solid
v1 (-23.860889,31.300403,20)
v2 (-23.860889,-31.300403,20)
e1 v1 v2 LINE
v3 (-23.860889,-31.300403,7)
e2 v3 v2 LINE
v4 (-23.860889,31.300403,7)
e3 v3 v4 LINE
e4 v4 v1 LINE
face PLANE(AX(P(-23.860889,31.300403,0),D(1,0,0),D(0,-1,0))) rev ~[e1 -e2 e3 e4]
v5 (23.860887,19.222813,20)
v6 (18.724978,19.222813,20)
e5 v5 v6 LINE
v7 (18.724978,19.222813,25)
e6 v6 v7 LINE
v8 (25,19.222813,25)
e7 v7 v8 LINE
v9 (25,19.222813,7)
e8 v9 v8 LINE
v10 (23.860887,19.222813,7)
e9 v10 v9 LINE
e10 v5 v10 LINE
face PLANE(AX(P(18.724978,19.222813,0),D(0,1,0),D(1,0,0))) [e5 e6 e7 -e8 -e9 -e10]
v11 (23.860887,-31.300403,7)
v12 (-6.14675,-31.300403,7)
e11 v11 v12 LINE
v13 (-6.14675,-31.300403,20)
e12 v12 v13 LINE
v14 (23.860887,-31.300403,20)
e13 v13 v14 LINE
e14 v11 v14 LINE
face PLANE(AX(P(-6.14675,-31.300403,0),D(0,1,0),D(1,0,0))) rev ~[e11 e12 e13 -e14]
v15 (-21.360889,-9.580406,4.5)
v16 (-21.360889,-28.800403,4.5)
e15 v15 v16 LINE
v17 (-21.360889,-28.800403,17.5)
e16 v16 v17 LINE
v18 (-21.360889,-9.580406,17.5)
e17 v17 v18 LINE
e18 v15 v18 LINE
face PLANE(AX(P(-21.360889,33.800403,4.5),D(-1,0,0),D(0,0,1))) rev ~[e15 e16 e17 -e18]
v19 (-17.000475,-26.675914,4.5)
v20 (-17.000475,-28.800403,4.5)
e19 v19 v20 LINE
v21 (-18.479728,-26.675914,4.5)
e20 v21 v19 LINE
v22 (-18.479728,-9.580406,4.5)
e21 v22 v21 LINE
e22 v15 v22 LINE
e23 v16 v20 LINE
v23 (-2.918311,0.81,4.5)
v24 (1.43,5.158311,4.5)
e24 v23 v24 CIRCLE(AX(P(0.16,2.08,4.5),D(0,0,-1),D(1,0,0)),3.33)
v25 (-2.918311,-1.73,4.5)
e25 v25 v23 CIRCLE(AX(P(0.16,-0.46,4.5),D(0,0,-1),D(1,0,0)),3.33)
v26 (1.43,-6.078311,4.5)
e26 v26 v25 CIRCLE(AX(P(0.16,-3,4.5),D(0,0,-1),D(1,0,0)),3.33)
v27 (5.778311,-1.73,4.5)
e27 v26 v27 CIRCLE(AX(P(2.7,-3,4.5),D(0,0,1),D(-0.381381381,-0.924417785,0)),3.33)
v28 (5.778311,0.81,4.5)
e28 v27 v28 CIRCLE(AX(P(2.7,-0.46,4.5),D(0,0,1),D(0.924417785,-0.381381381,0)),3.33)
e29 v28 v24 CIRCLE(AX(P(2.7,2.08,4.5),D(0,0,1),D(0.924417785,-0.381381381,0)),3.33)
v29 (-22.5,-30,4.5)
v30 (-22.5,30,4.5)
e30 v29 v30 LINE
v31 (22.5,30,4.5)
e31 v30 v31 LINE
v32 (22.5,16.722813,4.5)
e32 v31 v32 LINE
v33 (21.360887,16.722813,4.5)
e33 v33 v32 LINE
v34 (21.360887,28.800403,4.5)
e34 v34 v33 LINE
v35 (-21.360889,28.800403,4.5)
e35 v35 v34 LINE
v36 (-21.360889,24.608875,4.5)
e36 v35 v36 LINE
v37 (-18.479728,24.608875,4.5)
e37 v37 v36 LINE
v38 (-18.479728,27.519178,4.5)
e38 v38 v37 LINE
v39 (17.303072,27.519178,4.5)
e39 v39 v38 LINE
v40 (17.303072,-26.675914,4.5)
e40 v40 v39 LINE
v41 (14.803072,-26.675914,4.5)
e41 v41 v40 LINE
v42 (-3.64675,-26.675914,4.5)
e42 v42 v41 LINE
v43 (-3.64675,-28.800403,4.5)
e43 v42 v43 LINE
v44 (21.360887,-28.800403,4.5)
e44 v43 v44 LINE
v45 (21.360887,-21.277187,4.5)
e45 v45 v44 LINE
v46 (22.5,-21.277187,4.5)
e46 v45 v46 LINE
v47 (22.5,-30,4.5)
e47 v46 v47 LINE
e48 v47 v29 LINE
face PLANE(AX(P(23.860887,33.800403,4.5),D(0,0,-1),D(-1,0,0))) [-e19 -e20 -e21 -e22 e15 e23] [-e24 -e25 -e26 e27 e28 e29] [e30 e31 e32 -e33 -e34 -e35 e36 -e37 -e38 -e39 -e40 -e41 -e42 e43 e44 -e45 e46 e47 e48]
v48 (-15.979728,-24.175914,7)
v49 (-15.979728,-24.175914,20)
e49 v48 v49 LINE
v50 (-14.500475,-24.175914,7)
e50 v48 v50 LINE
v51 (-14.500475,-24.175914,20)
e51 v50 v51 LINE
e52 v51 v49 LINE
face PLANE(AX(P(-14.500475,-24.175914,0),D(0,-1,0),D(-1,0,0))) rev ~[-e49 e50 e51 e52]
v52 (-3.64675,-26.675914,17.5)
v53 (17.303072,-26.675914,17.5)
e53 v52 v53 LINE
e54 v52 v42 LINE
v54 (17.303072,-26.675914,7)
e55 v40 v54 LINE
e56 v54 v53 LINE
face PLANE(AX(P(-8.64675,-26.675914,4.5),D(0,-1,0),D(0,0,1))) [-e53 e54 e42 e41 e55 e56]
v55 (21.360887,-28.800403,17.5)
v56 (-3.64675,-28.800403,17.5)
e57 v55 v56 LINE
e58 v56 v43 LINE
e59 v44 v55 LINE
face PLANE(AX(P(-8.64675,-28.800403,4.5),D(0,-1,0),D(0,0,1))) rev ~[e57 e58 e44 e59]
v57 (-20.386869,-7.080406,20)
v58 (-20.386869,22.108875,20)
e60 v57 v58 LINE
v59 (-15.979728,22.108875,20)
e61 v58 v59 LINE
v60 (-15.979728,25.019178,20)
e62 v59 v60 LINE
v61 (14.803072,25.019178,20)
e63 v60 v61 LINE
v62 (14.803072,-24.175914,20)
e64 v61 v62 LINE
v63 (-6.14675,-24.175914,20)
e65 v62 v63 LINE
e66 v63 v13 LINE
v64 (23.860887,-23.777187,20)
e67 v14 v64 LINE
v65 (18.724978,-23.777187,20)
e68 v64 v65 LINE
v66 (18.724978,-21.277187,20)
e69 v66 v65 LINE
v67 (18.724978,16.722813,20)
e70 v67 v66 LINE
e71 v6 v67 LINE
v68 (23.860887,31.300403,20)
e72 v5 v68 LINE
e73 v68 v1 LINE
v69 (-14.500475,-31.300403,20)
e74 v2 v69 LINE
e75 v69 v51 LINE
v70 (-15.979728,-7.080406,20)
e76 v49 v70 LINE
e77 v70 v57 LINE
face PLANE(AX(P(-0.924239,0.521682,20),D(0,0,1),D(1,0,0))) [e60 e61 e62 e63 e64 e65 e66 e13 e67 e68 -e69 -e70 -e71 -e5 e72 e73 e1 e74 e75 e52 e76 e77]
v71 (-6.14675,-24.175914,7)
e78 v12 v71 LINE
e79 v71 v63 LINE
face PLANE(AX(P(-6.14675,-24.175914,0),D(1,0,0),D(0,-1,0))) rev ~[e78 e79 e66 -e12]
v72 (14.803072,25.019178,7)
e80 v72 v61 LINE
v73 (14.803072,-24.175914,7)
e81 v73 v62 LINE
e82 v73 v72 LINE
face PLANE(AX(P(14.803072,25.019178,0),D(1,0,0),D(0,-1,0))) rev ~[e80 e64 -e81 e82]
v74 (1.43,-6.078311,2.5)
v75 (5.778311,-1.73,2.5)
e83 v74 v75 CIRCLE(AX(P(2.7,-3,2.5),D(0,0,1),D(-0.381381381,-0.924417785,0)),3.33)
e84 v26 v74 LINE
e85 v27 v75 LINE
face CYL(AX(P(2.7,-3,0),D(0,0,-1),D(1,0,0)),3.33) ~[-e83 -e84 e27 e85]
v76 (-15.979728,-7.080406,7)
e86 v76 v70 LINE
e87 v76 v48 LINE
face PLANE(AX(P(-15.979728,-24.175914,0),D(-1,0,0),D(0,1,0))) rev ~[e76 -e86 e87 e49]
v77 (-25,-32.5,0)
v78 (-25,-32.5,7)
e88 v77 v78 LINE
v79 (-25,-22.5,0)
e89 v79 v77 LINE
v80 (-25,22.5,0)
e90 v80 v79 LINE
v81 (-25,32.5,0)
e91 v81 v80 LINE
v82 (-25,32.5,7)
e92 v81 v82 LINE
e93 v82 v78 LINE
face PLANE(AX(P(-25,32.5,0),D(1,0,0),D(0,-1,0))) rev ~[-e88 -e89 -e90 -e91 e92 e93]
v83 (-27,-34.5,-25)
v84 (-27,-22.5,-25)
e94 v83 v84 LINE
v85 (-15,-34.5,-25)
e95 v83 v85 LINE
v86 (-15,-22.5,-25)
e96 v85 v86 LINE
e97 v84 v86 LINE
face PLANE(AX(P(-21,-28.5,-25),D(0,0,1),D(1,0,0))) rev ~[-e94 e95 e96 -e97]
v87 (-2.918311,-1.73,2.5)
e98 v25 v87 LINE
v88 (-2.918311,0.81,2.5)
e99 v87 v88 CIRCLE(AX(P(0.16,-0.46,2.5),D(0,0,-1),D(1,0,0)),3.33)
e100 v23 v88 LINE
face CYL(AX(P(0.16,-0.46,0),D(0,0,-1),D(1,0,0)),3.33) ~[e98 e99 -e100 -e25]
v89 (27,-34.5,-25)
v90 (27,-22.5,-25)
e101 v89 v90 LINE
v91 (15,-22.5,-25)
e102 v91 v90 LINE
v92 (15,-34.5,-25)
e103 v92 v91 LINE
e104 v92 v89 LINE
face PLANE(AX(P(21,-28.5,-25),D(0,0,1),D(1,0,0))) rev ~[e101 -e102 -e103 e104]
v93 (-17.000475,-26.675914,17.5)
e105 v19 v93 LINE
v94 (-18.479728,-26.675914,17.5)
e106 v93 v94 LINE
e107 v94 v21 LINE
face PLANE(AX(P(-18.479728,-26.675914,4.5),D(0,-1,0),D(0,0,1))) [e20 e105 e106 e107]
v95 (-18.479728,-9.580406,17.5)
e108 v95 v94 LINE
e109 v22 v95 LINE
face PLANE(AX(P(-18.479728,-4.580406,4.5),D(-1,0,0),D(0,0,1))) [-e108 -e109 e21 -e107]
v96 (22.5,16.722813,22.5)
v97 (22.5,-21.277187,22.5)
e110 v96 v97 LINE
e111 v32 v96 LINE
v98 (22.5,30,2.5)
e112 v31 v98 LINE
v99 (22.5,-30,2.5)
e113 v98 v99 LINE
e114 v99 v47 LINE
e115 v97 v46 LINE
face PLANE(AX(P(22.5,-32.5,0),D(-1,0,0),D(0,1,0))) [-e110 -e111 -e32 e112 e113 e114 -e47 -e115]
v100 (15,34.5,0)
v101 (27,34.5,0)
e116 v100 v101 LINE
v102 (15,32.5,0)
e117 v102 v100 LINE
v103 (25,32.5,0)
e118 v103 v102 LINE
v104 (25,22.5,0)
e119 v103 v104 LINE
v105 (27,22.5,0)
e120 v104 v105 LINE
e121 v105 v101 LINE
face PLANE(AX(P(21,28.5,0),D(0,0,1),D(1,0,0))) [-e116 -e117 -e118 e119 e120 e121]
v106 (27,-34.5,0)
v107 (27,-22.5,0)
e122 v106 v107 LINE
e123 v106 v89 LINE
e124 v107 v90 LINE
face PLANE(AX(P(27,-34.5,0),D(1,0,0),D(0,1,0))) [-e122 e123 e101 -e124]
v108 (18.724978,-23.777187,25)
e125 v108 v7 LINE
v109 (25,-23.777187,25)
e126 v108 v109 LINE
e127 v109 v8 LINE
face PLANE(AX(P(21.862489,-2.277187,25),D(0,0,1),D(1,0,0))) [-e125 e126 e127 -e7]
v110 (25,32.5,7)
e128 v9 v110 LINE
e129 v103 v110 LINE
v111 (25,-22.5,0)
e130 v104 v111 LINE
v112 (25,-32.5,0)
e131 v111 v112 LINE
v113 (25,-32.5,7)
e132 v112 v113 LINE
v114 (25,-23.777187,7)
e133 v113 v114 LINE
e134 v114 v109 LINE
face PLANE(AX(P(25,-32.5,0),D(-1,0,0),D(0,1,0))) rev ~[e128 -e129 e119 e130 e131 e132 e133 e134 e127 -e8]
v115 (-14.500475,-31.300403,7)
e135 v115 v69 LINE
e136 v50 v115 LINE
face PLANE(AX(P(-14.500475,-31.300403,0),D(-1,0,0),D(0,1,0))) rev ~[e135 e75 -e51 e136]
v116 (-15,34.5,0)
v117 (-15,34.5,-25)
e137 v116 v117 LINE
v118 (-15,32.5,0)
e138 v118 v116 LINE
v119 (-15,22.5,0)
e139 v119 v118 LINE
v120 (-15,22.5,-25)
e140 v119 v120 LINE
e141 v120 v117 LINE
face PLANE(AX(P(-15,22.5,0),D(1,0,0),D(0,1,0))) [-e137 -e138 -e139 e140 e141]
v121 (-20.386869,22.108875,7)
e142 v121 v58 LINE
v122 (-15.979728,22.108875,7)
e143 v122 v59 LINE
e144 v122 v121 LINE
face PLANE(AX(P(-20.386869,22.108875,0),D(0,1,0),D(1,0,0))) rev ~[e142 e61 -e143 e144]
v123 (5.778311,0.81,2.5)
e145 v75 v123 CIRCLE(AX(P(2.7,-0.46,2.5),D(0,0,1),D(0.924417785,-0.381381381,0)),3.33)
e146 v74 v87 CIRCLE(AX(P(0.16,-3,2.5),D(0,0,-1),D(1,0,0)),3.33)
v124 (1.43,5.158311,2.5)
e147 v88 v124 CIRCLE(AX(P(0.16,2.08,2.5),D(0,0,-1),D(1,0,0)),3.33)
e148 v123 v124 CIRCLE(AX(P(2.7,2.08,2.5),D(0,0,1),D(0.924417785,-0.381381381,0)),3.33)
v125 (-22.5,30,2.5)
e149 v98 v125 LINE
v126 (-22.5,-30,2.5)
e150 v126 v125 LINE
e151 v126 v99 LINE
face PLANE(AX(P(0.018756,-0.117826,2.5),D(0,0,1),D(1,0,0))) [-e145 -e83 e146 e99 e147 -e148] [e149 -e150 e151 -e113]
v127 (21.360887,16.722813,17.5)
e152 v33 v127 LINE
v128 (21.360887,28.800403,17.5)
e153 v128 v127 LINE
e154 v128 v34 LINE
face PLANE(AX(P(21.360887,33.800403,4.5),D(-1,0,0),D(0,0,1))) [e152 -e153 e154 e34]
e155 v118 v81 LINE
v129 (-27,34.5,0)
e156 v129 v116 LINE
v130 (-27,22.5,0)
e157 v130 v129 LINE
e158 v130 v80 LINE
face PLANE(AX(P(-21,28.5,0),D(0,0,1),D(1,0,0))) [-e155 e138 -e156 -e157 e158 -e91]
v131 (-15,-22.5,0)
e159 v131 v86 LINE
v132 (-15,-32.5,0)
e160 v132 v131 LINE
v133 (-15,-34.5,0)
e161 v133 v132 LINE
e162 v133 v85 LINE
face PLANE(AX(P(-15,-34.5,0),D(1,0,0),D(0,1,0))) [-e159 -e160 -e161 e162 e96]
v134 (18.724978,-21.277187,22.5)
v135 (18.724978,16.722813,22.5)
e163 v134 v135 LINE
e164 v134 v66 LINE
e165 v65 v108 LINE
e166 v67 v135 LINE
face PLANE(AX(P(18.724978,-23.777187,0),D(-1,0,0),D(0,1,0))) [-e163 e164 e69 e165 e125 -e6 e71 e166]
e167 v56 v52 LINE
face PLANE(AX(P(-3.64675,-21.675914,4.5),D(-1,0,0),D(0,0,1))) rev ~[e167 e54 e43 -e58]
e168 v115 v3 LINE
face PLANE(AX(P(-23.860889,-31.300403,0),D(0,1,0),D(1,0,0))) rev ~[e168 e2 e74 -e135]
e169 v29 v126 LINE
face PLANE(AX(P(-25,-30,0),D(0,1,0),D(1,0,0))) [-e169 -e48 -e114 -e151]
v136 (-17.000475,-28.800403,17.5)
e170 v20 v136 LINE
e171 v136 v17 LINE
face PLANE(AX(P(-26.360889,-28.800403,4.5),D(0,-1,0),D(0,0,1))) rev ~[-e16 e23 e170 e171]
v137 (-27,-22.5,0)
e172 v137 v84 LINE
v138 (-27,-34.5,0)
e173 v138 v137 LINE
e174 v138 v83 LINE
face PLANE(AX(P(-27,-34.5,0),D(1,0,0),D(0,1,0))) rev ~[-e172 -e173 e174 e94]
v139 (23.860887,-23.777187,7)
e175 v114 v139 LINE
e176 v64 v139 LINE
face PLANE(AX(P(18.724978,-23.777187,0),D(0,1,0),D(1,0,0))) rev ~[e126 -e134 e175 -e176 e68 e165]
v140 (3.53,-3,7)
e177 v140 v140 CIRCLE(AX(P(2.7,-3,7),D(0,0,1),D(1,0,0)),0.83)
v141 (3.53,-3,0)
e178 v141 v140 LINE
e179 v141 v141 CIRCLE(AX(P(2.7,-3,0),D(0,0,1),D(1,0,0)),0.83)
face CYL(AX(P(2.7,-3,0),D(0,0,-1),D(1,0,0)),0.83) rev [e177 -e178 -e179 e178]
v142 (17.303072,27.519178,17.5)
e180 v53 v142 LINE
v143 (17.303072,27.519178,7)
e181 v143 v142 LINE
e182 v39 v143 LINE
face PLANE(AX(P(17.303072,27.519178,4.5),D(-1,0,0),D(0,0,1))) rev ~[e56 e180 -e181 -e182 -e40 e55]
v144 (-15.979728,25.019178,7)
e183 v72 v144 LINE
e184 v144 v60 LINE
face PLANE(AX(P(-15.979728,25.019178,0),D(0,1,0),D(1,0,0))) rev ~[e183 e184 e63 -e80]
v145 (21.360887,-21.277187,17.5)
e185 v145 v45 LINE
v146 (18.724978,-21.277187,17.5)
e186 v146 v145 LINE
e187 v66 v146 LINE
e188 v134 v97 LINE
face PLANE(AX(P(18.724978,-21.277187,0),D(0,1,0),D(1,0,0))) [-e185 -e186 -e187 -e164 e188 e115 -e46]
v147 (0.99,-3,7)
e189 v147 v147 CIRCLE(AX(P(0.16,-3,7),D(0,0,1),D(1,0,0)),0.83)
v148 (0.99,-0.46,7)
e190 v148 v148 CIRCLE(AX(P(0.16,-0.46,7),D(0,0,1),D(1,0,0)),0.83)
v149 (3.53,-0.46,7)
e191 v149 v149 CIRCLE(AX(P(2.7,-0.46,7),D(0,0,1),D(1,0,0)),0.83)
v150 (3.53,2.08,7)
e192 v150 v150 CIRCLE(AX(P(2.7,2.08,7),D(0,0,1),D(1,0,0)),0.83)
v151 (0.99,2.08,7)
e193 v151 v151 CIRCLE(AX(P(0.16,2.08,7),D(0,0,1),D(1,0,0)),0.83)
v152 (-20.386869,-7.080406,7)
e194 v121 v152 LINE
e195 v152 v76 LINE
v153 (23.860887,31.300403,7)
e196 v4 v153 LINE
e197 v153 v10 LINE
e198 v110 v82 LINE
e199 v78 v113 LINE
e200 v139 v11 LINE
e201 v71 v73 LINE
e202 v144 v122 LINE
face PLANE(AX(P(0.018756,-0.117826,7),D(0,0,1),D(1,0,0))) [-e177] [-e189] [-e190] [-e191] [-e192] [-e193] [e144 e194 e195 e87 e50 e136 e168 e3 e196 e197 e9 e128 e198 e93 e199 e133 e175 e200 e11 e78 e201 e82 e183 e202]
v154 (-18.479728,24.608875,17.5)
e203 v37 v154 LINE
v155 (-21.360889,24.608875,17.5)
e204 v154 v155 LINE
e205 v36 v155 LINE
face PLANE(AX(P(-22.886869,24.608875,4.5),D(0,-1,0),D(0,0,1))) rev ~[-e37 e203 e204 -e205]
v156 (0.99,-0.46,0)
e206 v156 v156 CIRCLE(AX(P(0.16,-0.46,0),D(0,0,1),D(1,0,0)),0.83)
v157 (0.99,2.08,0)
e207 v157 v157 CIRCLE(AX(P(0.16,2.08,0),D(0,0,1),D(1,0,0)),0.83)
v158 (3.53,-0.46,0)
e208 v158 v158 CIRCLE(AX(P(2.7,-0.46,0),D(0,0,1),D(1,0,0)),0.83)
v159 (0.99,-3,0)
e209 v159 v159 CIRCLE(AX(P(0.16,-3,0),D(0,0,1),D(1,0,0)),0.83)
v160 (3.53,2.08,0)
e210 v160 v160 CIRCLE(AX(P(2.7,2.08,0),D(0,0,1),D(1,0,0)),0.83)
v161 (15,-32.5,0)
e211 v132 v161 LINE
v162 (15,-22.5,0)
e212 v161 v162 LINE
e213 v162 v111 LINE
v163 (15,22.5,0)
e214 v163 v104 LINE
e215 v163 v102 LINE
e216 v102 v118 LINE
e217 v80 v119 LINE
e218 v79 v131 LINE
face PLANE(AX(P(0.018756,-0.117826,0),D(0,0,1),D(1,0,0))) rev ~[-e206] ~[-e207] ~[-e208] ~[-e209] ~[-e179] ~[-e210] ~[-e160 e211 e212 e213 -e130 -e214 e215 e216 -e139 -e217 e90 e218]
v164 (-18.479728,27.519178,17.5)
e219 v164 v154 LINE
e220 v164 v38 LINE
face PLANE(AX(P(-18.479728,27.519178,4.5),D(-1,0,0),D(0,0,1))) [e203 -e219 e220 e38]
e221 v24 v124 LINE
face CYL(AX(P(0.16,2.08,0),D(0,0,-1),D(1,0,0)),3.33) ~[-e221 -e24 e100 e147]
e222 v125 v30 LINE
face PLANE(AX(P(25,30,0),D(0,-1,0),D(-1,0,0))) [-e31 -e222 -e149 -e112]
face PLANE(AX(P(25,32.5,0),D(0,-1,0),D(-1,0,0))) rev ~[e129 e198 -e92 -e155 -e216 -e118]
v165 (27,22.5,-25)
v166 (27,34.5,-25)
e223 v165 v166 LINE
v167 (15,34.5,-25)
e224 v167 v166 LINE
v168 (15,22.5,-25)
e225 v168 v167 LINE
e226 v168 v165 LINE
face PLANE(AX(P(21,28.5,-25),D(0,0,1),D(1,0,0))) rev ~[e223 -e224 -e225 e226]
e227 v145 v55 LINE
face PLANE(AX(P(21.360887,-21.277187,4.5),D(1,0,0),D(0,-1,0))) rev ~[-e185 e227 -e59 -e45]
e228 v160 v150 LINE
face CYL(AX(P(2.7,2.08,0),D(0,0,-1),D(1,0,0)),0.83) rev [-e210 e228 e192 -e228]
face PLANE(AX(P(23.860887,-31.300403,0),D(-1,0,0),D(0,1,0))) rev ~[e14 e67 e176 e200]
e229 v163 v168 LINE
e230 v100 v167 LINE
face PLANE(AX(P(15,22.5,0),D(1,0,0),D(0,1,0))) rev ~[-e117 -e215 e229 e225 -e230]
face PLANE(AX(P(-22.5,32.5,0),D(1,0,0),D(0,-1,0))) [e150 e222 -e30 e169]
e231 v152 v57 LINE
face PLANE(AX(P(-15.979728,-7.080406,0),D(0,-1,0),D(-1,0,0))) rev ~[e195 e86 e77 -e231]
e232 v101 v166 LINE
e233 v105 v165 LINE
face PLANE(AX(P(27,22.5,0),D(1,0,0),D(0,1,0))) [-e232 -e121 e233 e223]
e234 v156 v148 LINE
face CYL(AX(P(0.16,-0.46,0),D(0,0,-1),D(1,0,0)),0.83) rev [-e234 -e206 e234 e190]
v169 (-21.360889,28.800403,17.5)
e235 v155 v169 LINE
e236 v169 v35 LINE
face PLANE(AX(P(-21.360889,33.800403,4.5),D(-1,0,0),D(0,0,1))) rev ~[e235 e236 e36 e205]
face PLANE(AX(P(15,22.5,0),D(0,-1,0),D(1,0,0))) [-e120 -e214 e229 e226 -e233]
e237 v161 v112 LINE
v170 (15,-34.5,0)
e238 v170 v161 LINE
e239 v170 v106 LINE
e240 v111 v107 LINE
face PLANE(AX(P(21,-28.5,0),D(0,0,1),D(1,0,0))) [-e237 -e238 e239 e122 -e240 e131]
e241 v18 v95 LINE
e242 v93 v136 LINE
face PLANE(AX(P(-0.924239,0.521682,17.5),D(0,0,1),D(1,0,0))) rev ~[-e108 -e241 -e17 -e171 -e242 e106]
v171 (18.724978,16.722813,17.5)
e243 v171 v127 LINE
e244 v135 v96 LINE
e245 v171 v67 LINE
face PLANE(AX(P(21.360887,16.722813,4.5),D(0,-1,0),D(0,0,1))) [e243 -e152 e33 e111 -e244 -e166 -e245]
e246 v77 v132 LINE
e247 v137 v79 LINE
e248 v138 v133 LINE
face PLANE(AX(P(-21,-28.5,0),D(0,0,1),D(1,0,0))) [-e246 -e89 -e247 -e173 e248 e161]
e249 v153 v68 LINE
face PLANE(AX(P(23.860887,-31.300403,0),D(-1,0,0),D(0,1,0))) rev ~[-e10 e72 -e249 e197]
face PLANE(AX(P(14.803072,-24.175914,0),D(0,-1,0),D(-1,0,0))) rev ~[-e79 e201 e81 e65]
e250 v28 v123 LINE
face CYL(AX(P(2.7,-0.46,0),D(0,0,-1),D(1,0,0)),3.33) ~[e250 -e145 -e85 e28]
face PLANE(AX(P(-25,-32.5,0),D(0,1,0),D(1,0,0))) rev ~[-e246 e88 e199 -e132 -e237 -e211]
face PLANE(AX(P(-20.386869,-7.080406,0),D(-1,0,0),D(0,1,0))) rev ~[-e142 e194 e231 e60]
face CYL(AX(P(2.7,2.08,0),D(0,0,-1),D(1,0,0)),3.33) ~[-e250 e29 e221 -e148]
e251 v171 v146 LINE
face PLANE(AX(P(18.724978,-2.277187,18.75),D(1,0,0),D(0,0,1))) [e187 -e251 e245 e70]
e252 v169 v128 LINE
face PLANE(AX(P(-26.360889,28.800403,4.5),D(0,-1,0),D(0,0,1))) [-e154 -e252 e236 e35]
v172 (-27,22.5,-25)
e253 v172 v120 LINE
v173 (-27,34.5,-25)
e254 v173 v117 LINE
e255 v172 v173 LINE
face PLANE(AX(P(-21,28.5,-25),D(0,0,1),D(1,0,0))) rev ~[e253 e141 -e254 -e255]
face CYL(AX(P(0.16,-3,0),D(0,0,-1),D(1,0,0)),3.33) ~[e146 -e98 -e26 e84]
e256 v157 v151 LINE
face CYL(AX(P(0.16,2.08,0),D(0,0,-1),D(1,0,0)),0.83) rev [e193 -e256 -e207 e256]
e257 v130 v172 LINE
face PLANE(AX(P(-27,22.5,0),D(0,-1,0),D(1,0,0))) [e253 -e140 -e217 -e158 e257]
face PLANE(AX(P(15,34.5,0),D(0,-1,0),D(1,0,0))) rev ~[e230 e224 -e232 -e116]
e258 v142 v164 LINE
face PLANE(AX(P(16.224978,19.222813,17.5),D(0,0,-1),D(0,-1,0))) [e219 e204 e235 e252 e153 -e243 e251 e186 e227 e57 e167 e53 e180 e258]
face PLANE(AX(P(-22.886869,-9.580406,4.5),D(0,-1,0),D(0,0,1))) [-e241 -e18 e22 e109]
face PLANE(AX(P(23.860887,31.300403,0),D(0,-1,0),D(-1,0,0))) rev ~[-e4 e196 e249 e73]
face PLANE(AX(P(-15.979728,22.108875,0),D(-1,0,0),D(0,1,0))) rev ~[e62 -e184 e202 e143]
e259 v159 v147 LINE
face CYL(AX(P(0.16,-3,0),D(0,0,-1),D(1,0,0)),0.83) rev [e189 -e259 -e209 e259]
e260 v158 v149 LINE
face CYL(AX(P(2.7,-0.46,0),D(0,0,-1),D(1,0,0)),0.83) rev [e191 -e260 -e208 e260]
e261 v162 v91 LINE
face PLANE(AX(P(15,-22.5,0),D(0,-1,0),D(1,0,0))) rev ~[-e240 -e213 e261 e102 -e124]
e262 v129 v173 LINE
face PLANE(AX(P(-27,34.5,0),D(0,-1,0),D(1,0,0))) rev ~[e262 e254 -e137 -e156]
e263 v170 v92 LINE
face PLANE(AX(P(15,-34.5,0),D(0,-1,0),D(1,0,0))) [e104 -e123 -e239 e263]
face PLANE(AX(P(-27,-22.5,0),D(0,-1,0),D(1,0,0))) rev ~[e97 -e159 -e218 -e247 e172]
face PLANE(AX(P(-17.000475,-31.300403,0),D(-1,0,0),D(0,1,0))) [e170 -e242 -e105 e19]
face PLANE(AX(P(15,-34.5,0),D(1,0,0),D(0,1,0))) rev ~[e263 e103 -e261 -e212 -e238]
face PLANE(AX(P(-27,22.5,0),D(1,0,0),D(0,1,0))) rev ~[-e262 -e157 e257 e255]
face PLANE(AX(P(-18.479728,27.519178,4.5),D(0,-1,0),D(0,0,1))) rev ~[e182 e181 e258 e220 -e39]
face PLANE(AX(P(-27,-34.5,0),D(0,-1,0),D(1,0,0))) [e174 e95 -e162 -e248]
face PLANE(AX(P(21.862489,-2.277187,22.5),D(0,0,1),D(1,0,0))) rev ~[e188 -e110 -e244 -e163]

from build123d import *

# Parameters (mm, degrees)
F0_R         = 0.83
F1_DEPTH     = 7
F3_DEPTH     = 20
F0_W         = 6.2750220299
F0_H         = 43
F4_DEPTH     = 25
F5_T         = 2.5
F5_T3_DEPTH  = 6.139113307
F5_T5_DEPTH  = 17.0775900483
F5_T7_DEPTH  = 52.7217752486
F5_T9_DEPTH  = 67.6008063555
F5_T11_DEPTH = 14.360413067
F5_T13_DEPTH = 12.124489639
F5_T15_DEPTH = 6.4792522416
F5_T17_DEPTH = 22.0955071226
F5_T19_DEPTH = 9.4071413577
F5_T21_DEPTH = 34.1892816313
F5_T23_DEPTH = 7.9103027191
F5_T25_DEPTH = 35.7827994693
F5_T27_DEPTH = 54.1950914729
F5_T29_DEPTH = 25.949822152
F5_T31_DEPTH = 35.0076371059
F5_T33_DEPTH = 12.5232163072
F5_T35_DEPTH = 10.1359087229
F5_T37_DEPTH = 18
F6_W         = 12
F6_H         = 12
F7_DEPTH     = 25


# Not quite as in the source:
# - a shell that OpenCascade refuses in one call is made with other operations: the cavity is built on its own and cut out


with BuildPart() as f1:
    # F0 (on Top) → F1 (new body)
    with BuildSketch(Plane.XY):
        Polygon((25, 32.5), (-25, 32.5), (-25, -32.5), (25, -32.5), (25, -23.7771868706), (18.7249779701, -23.7771868706), (18.7249779701, 19.2228131294), (25, 19.2228131294), align=None)
        with Locations((0.16, -3)):
            Circle(F0_R, mode=Mode.SUBTRACT)
        with Locations((2.7, -3)):
            Circle(F0_R, mode=Mode.SUBTRACT)
        with Locations((0.16, -0.46)):
            Circle(F0_R, mode=Mode.SUBTRACT)
        with Locations((2.7, -0.46)):
            Circle(F0_R, mode=Mode.SUBTRACT)
        with Locations((0.16, 2.08)):
            Circle(F0_R, mode=Mode.SUBTRACT)
        with Locations((2.7, 2.08)):
            Circle(F0_R, mode=Mode.SUBTRACT)
    extrude(amount=F1_DEPTH)

    # F2 (on Top) → F3 (join)
    with BuildSketch(Plane.XY):
        Polygon((23.860886693, 31.3004031777), (-23.8608885556, 31.3004031777), (-23.8608885556, -31.3004031777), (-14.5004754886, -31.3004031777), (-14.5004754886, -24.1759135388), (-15.9797277302, -24.1759135388), (-15.9797277302, -7.0804064162), (-20.3868690878, -7.0804064162), (-20.3868690878, 22.1088752151), (-15.9797277302, 22.1088752151), (-15.9797277302, 25.0191779342), (14.8030717392, 25.0191779342), (14.8030717392, -24.1759135388), (-6.1467504129, -24.1759135388), (-6.1467504129, -31.3004031777), (23.860886693, -31.3004031777), align=None)
    extrude(amount=F3_DEPTH)

    # F0 (on Top) → F4 (join)
    with BuildSketch(Plane.XY):
        with Locations((21.8624889851, -2.2771868706)):
            Rectangle(F0_W, F0_H)
    extrude(amount=F4_DEPTH)

    # F5: shell of thickness 2.5, made by hand


with BuildPart() as f5_core1:
    # F5_t2: copy of F1
    add(f1.part)

    # the walls: a layer under each face that stays
    f5_faces = [f5_core1.faces().sort_by_distance(p)[0] for p in [
        (0, 32.5, 3.5),
        (-16.6666666667, 0, 7),
        (1.87, 2.08, 3.5),
        (1.87, -0.46, 3.5),
        (-0.67, 2.08, 3.5),
        (-0.67, -0.46, 3.5),
        (1.87, -3, 3.5),
        (-0.67, -3, 3.5),
        (0, -32.5, 3.5),
        (19.7708149751, -23.7771868706, 22),
        (21.8624889851, -2.2771868706, 25),
        (15.9072574849, -20.8669354518, 20),
        (23.860886693, -27.5387950242, 13.5),
        (8.8570681401, -31.3004031777, 13.5),
        (-6.1467504129, -27.7381583583, 13.5),
        (4.3281606631, -24.1759135388, 13.5),
        (14.8030717392, 0.4216321977, 13.5),
        (-0.5883279955, 25.0191779342, 13.5),
        (-15.9797277302, 23.5640265746, 13.5),
        (-18.183298409, 22.1088752151, 13.5),
        (-20.3868690878, 7.5142343994, 13.5),
        (-18.183298409, -7.0804064162, 13.5),
        (-15.9797277302, -15.6281599775, 13.5),
        (-15.2401016094, -24.1759135388, 13.5),
        (-14.5004754886, -27.7381583583, 13.5),
        (-19.1806820221, -31.3004031777, 13.5),
        (-23.8608885556, 0, 13.5),
        (-9.313e-07, 31.3004031777, 13.5),
        (23.860886693, 25.2616081536, 13.5),
        (23.954162995, 19.2228131294, 22),
        (-16.6666666667, -21.6666666667, 0),
        (-25, 0, 3.5),
        (25, 0, 12.5),
    ]]
    thicken(f5_faces, amount=-F5_T, mode=Mode.SUBTRACT)

    # F5_s4 → F5_t3 (cut)
    with BuildSketch(Plane.YZ.offset(21.360886693)):
        Polygon((19.2478131294, 7.025), (19.2228131294, 4.5), (16.7228131294, 4.5), (16.7228131294, 7), align=None)
        Polygon((-23.8021868706, 7.025), (-23.7771868706, 4.5), (-21.2771868706, 4.5), (-21.2771868706, 7), align=None)
    extrude(amount=F5_T3_DEPTH, mode=Mode.SUBTRACT)

    # F5_s6 → F5_t5 (cut)
    with BuildSketch(Plane.XZ.offset(-33.8004031777)):
        Polygon((23.885886693, 7.025), (23.860886693, 4.5), (21.360886693, 4.5), (21.360886693, 7), align=None)
    extrude(amount=F5_T5_DEPTH, mode=Mode.SUBTRACT)

    # F5_s8 → F5_t7 (cut)
    with BuildSketch(Plane.YZ.offset(-26.3608885556)):
        Polygon((31.3254031777, 7.025), (31.3004031777, 4.5), (28.8004031777, 4.5), (28.8004031777, 7), align=None)
    extrude(amount=F5_T7_DEPTH, mode=Mode.SUBTRACT)

    # F5_s10 → F5_t9 (cut)
    with BuildSketch(Plane.XZ.offset(-33.8004031777)):
        Polygon((-23.8858885556, 7.025), (-23.8608885556, 4.5), (-21.3608885556, 4.5), (-21.3608885556, 7), align=None)
    extrude(amount=F5_T9_DEPTH, mode=Mode.SUBTRACT)

    # F5_s12 → F5_t11 (cut)
    with BuildSketch(Plane.YZ.offset(-26.3608885556)):
        Polygon((-31.3254031777, 7.025), (-31.3004031777, 4.5), (-28.8004031777, 4.5), (-28.8004031777, 7), align=None)
    extrude(amount=F5_T11_DEPTH, mode=Mode.SUBTRACT)

    # F5_s14 → F5_t13 (cut)
    with BuildSketch(Plane.XZ.offset(21.6759135388)):
        Polygon((-14.4754754886, 7.025), (-14.5004754886, 4.5), (-17.0004754886, 4.5), (-17.0004754886, 7), align=None)
        Polygon((-6.1717504129, 7.025), (-6.1467504129, 4.5), (-3.6467504129, 4.5), (-3.6467504129, 7), align=None)
    extrude(amount=F5_T13_DEPTH, mode=Mode.SUBTRACT)

    # F5_s16 → F5_t15 (cut)
    with BuildSketch(Plane.YZ.offset(-18.4797277302)):
        Polygon((-24.1509135388, 7.025), (-24.1759135388, 4.5), (-26.6759135388, 4.5), (-26.6759135388, 7), align=None)
    extrude(amount=F5_T15_DEPTH, mode=Mode.SUBTRACT)

    # F5_s18 → F5_t17 (cut)
    with BuildSketch(Plane.XZ.offset(4.5804064162)):
        Polygon((-15.9547277302, 7.025), (-15.9797277302, 4.5), (-18.4797277302, 4.5), (-18.4797277302, 7), align=None)
    extrude(amount=F5_T17_DEPTH, mode=Mode.SUBTRACT)

    # F5_s20 → F5_t19 (cut)
    with BuildSketch(Plane.YZ.offset(-22.8868690878)):
        Polygon((-7.0554064162, 7.025), (-7.0804064162, 4.5), (-9.5804064162, 4.5), (-9.5804064162, 7), align=None)
        Polygon((22.0838752151, 7.025), (22.1088752151, 4.5), (24.6088752151, 4.5), (24.6088752151, 7), align=None)
    extrude(amount=F5_T19_DEPTH, mode=Mode.SUBTRACT)

    # F5_s22 → F5_t21 (cut)
    with BuildSketch(Plane.XZ.offset(-24.6088752151)):
        Polygon((-20.3618690878, 7.025), (-20.3868690878, 4.5), (-22.8868690878, 4.5), (-22.8868690878, 7), align=None)
    extrude(amount=F5_T21_DEPTH, mode=Mode.SUBTRACT)

    # F5_s24 → F5_t23 (cut)
    with BuildSketch(Plane.XZ.offset(-27.5191779342)):
        Polygon((-15.9547277302, 7.025), (-15.9797277302, 4.5), (-18.4797277302, 4.5), (-18.4797277302, 7), align=None)
    extrude(amount=F5_T23_DEPTH, mode=Mode.SUBTRACT)

    # F5_s26 → F5_t25 (cut)
    with BuildSketch(Plane.YZ.offset(-18.4797277302)):
        Polygon((24.9941779342, 7.025), (25.0191779342, 4.5), (27.5191779342, 4.5), (27.5191779342, 7), align=None)
    extrude(amount=F5_T25_DEPTH, mode=Mode.SUBTRACT)

    # F5_s28 → F5_t27 (cut)
    with BuildSketch(Plane.XZ.offset(-27.5191779342)):
        Polygon((14.7780717392, 7.025), (14.8030717392, 4.5), (17.3030717392, 4.5), (17.3030717392, 7), align=None)
    extrude(amount=F5_T27_DEPTH, mode=Mode.SUBTRACT)

    # F5_s30 → F5_t29 (cut)
    with BuildSketch(Plane.YZ.offset(-8.6467504129)):
        Polygon((-24.1509135388, 7.025), (-24.1759135388, 4.5), (-26.6759135388, 4.5), (-26.6759135388, 7), align=None)
    extrude(amount=F5_T29_DEPTH, mode=Mode.SUBTRACT)

    # F5_s32 → F5_t31 (cut)
    with BuildSketch(Plane.YZ.offset(-8.6467504129)):
        Polygon((-31.3254031777, 7.025), (-31.3004031777, 4.5), (-28.8004031777, 4.5), (-28.8004031777, 7), align=None)
    extrude(amount=F5_T31_DEPTH, mode=Mode.SUBTRACT)

    # F5_s34 → F5_t33 (cut)
    with BuildSketch(Plane.XZ.offset(21.2771868706)):
        Polygon((23.885886693, 7.025), (23.860886693, 4.5), (21.360886693, 4.5), (21.360886693, 7), align=None)
    extrude(amount=F5_T33_DEPTH, mode=Mode.SUBTRACT)

    # F5_s36 → F5_t35 (cut)
    with BuildSketch(Plane.YZ.offset(16.2249779701)):
        Polygon((-23.8021868706, 20.025), (-21.2771868706, 20), (-21.2771868706, 17.5), (-23.7771868706, 17.5), align=None)
        Polygon((19.2478131294, 20.025), (19.2228131294, 17.5), (16.7228131294, 17.5), (16.7228131294, 20), align=None)
    extrude(amount=F5_T35_DEPTH, mode=Mode.SUBTRACT)

    # F5_s38 → F5_t37 (cut)
    with BuildSketch(Plane.XY.offset(4.5)):
        Polygon((23.885886693, -23.8021868706), (23.860886693, -21.2771868706), (21.360886693, -21.2771868706), (21.360886693, -23.7771868706), align=None)
        Polygon((14.7780717392, -24.1509135388), (14.8030717392, -26.6759135388), (17.3030717392, -26.6759135388), (17.3030717392, -24.1759135388), align=None)
        Polygon((14.7780717392, 24.9941779342), (17.3030717392, 25.0191779342), (17.3030717392, 27.5191779342), (14.8030717392, 27.5191779342), align=None)
        Polygon((-15.9547277302, 24.9941779342), (-15.9797277302, 27.5191779342), (-18.4797277302, 27.5191779342), (-18.4797277302, 25.0191779342), align=None)
        Polygon((-20.3618690878, 22.0838752151), (-20.3868690878, 24.6088752151), (-22.8868690878, 24.6088752151), (-22.8868690878, 22.1088752151), align=None)
        Polygon((-20.3618690878, -7.0554064162), (-22.8868690878, -7.0804064162), (-22.8868690878, -9.5804064162), (-20.3868690878, -9.5804064162), align=None)
        Polygon((-15.9547277302, -24.1509135388), (-18.4797277302, -24.1759135388), (-18.4797277302, -26.6759135388), (-15.9797277302, -26.6759135388), align=None)
        Polygon((23.885886693, 19.2478131294), (21.360886693, 19.2228131294), (21.360886693, 16.7228131294), (23.860886693, 16.7228131294), align=None)
    extrude(amount=F5_T37_DEPTH, mode=Mode.SUBTRACT)


with BuildPart() as f1_1:
    add(f1.part)

    # what is left inside the walls is the cavity
    f5_cavity = [f5_core1.part.solids().sort_by_distance(p)[0] for p in [
        (0, -10, 2.525),
    ]]
    add(f5_cavity, mode=Mode.SUBTRACT)

    # F6 (on Top) → F7 (join)
    with BuildSketch(Plane.XY):
        with Locations((-21, 28.5)):
            Rectangle(F6_W, F6_H)
        with Locations((-21, -28.5)):
            Rectangle(F6_W, F6_H)
        with Locations((21, -28.5)):
            Rectangle(F6_W, F6_H)
        with Locations((21, 28.5)):
            Rectangle(F6_W, F6_H)
    extrude(amount=-F7_DEPTH)


solid = f1_1.part
